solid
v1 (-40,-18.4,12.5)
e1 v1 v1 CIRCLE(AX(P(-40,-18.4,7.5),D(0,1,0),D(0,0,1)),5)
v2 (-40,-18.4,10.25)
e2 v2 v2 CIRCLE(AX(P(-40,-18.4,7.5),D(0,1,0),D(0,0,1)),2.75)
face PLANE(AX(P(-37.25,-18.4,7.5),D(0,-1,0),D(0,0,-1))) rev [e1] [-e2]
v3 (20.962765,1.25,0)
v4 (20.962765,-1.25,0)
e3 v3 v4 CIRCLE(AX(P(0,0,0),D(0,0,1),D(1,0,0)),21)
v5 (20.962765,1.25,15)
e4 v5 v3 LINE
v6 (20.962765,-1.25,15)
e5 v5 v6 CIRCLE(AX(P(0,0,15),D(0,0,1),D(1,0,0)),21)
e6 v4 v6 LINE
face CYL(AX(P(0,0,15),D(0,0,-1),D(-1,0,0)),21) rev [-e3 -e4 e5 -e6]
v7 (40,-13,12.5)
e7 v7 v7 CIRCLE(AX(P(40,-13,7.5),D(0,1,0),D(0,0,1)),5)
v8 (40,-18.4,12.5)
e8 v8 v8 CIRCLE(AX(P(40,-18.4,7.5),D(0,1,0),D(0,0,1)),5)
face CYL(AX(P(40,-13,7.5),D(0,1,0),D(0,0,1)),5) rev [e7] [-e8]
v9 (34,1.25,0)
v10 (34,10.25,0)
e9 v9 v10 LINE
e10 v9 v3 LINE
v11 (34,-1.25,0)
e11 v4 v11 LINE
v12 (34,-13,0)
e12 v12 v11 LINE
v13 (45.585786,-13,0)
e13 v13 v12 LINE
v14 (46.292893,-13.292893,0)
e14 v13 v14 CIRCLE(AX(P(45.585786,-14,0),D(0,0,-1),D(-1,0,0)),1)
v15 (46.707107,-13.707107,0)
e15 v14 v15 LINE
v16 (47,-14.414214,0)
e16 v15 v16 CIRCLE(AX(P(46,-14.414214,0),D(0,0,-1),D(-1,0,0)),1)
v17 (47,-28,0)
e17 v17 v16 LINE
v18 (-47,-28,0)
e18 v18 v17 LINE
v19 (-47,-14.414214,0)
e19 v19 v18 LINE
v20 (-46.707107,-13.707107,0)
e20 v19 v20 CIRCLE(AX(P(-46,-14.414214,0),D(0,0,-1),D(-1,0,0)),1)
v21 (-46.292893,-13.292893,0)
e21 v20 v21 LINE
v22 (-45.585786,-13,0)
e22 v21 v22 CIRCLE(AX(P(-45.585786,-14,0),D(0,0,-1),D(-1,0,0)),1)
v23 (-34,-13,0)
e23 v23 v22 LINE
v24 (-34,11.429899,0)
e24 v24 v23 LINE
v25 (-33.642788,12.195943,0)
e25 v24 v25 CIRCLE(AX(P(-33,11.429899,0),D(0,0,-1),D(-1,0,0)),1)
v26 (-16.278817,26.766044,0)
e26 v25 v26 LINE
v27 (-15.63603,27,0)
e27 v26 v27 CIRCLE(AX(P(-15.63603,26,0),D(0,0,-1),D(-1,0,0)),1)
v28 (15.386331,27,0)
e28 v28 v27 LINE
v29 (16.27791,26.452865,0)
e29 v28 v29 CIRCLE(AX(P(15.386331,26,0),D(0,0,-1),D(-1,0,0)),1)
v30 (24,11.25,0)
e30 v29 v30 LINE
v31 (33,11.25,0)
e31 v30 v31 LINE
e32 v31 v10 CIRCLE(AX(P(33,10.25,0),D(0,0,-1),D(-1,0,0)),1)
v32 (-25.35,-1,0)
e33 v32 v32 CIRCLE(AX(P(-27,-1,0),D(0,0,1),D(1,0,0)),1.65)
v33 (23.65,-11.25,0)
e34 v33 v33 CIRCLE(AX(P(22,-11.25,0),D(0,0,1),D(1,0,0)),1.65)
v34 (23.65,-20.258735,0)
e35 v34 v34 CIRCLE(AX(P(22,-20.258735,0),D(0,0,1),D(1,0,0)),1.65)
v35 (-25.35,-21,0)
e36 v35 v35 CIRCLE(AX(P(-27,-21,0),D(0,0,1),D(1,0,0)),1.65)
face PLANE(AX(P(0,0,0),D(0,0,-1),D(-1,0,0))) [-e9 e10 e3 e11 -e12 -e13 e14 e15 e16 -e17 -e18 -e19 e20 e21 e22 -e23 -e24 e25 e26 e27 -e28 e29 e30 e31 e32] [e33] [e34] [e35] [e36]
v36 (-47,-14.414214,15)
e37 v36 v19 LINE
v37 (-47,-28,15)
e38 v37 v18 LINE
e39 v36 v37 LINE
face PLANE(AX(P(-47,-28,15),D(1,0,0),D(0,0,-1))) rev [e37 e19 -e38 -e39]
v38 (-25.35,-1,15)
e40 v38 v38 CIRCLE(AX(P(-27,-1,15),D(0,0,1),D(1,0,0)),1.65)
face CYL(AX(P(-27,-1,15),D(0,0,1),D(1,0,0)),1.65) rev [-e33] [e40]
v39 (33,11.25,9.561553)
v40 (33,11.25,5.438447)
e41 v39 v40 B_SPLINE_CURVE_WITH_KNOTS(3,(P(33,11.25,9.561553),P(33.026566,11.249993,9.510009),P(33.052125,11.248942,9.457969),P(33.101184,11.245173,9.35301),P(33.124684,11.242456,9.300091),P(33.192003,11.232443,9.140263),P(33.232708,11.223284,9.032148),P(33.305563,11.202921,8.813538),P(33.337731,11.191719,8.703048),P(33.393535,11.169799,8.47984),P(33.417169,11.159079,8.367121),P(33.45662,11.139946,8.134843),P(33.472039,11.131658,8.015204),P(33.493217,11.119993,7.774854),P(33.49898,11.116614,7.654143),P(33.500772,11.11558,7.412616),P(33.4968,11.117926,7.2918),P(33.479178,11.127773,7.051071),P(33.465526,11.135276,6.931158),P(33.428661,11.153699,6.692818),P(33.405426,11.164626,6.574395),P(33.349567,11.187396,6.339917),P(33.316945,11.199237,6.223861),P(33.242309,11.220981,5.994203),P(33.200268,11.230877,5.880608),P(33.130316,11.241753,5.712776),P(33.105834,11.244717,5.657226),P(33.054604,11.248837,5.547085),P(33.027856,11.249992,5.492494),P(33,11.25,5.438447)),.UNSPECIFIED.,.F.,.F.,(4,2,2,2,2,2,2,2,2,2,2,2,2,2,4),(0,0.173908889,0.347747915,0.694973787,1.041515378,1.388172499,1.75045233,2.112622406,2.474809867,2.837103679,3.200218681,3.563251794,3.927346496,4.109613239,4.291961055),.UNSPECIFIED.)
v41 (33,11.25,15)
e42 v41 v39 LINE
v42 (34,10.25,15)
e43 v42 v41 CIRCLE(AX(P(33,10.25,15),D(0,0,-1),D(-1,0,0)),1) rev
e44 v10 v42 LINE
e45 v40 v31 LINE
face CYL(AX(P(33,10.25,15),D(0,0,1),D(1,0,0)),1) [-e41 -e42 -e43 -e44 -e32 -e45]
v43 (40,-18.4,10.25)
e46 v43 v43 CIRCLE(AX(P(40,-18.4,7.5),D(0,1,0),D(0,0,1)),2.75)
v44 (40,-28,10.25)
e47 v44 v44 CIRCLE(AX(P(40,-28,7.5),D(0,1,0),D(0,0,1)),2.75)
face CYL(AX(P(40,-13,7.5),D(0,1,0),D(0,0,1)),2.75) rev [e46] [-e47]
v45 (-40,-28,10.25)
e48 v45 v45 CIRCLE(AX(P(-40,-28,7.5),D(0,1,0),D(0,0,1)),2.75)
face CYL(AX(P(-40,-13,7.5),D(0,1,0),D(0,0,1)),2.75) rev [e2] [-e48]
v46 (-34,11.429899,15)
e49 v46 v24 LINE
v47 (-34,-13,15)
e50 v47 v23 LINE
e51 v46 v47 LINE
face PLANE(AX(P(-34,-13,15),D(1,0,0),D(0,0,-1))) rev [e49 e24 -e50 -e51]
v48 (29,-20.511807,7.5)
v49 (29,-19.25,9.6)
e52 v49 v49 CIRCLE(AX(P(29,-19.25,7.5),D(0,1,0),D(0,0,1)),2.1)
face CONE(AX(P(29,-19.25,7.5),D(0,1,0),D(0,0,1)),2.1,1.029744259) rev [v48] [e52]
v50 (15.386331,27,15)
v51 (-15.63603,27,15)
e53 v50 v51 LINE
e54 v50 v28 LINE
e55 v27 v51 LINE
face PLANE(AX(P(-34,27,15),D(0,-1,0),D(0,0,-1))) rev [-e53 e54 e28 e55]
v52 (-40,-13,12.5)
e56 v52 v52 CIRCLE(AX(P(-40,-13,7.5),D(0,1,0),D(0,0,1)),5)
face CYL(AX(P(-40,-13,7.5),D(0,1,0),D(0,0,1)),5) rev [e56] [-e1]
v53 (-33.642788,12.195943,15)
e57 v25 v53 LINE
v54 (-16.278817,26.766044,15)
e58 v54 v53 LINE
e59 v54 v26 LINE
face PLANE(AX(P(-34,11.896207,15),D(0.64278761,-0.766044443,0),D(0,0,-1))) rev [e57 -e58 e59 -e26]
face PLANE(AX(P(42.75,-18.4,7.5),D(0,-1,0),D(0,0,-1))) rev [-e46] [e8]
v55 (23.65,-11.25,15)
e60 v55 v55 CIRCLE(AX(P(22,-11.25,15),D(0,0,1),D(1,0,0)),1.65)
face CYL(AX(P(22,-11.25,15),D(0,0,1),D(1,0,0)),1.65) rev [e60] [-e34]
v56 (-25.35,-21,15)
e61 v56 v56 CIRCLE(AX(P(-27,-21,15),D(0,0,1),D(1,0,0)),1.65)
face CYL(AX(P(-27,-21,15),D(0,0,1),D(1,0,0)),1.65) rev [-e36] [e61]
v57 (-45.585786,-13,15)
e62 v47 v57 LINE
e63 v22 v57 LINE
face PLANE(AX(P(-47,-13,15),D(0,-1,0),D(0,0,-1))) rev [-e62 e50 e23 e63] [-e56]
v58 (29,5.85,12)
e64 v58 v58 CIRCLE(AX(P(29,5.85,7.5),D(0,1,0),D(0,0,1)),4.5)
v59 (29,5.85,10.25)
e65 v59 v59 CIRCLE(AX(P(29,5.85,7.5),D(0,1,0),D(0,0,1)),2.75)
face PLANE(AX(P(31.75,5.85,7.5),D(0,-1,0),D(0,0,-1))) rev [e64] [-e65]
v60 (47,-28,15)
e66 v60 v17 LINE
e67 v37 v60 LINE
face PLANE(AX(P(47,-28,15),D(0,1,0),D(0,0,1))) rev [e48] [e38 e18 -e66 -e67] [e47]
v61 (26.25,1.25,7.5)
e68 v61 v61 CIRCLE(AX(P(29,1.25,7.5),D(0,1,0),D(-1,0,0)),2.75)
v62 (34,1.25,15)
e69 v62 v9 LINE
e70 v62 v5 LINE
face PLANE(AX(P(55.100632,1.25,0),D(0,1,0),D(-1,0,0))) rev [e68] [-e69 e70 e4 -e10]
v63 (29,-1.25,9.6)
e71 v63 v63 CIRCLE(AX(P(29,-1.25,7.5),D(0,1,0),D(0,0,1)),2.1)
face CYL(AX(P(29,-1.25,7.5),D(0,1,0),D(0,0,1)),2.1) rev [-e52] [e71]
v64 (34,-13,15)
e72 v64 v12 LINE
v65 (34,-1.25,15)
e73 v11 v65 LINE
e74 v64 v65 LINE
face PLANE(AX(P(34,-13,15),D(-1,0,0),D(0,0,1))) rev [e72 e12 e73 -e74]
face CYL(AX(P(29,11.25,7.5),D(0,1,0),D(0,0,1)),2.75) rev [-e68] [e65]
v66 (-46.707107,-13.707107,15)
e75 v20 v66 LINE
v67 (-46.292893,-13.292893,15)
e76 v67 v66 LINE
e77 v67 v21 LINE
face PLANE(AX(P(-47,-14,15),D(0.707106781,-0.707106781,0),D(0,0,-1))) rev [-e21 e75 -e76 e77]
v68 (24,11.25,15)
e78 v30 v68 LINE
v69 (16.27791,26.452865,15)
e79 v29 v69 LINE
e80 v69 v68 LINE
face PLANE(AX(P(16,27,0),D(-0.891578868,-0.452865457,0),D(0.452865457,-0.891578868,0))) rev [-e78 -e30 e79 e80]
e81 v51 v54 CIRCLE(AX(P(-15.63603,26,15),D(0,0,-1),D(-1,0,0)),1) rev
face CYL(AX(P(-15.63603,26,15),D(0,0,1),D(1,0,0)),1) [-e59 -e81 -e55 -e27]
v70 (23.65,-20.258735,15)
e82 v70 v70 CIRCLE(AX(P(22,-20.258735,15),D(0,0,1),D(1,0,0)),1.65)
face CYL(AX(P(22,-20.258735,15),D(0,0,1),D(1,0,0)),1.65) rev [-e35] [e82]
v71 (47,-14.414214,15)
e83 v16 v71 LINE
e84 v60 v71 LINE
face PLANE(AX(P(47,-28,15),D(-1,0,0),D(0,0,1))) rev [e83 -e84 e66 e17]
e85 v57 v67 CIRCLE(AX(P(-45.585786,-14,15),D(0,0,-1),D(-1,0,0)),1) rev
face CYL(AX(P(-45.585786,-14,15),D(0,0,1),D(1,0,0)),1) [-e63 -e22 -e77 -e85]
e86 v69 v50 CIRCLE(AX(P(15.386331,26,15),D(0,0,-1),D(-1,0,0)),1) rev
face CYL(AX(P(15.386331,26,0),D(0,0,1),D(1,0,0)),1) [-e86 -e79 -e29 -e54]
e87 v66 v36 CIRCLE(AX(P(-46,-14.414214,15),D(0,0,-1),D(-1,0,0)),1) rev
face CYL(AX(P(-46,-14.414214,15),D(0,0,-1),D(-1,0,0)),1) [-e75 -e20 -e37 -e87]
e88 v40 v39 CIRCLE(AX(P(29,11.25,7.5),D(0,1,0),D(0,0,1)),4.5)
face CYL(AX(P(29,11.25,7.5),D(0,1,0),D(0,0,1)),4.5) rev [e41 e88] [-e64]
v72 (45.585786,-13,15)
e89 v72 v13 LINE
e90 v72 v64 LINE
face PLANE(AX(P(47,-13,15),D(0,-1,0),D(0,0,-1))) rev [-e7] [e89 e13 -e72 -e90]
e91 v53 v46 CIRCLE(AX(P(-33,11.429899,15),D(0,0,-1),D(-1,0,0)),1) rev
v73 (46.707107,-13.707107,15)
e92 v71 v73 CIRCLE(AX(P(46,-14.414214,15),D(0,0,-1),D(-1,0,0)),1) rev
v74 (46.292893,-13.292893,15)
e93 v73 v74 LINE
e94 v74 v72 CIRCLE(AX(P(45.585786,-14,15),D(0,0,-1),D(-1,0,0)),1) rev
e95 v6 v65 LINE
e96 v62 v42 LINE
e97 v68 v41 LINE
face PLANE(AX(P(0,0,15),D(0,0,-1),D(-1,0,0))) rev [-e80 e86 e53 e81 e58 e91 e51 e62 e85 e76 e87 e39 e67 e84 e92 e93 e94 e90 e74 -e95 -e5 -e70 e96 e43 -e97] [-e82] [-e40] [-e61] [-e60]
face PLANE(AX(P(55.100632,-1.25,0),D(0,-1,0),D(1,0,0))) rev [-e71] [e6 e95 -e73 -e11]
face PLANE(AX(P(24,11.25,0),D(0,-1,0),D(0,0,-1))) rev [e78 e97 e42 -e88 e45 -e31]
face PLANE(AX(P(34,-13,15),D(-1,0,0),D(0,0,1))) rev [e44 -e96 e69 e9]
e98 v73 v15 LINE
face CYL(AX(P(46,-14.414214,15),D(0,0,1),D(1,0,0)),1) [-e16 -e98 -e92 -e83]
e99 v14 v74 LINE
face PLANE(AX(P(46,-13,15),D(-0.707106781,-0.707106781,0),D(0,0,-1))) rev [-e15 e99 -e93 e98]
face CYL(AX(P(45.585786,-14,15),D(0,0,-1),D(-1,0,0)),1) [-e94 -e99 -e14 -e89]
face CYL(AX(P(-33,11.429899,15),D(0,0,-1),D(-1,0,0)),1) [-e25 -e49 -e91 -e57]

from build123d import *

# Parameters (mm, degrees)
SKETCH1_R                                            = 21
BOSS_EXTRUDE1_DEPTH                                  = 15
SKETCH2_W                                            = 42.201264836
SKETCH2_H                                            = 2.5
CUT_EXTRUDE1_DEPTH                                   = 15
CUT_EXTRUDE2_DEPTH                                   = 15
CBORE_SLOT_FOR_M5_HEX_SOCKET_HEAD_CAP_SC_D           = 5.5
CBORE_SLOT_FOR_M5_HEX_SOCKET_HEAD_CAP_SC_CBORE_D     = 10
CBORE_SLOT_FOR_M5_HEX_SOCKET_HEAD_CAP_SC_CBORE_DEPTH = 5.4
CBORE_FOR_M5_HEX_SOCKET_HEAD_CAP_SCREW1_D            = 5.5
CBORE_FOR_M5_HEX_SOCKET_HEAD_CAP_SCREW1_DEPTH        = 10
CBORE_FOR_M5_HEX_SOCKET_HEAD_CAP_SCREW1_CBORE_D      = 9
CBORE_FOR_M5_HEX_SOCKET_HEAD_CAP_SCREW1_CBORE_DEPTH  = 5.4
CHAMFER1_SIZE                                        = 1
M4_TAPPED_HOLE1_D                                    = 3.3
M5_TAPPED_HOLE1_D                                    = 4.2
M5_TAPPED_HOLE1_DEPTH                                = 18
M5_TAPPED_HOLE1_TIP                                  = 1.2618073
CHAMFER2_SIZE                                        = 18
CHAMFER2_SIZE2                                       = 15.103793361
FILLET1_R                                            = 1


with BuildPart() as part:
    # Sketch1 → Boss-Extrude1 (new body)
    with BuildSketch(Plane.XY):
        Polygon((47, -28), (-47, -28), (-47, -13), (-34, -13), (-34, 27), (34, 27), (34, -13), (47, -13), align=None)
        Circle(SKETCH1_R, mode=Mode.SUBTRACT)
    extrude(amount=BOSS_EXTRUDE1_DEPTH)

    # Sketch2 → Cut-Extrude1 (cut)
    with BuildSketch(Plane.XY.offset(15)):
        with Locations((34, 0)):
            Rectangle(SKETCH2_W, SKETCH2_H)
    extrude(amount=-CUT_EXTRUDE1_DEPTH, mode=Mode.SUBTRACT)

    # Sketch3 → Cut-Extrude2 (cut)
    with BuildSketch(Plane.XY.offset(15)):
        Polygon((34, 27), (16, 27), (24, 11.25), (34, 11.25), align=None)
    extrude(amount=-CUT_EXTRUDE2_DEPTH, mode=Mode.SUBTRACT)

    # CBORE SLOT for M5 Hex Socket Head Cap Screw1 (through all)
    with Locations(Plane(origin=(0, -13, 0), x_dir=(1, 0, 0), z_dir=(0, 1, 0))):
        with Locations((-40, -7.5), (40, -7.5)):
            CounterBoreHole(CBORE_SLOT_FOR_M5_HEX_SOCKET_HEAD_CAP_SC_D / 2, CBORE_SLOT_FOR_M5_HEX_SOCKET_HEAD_CAP_SC_CBORE_D / 2, CBORE_SLOT_FOR_M5_HEX_SOCKET_HEAD_CAP_SC_CBORE_DEPTH)

    # CBORE for M5 Hex Socket Head Cap Screw1
    with Locations(Plane(origin=(29, 11.25, 7.5), x_dir=(0, 0, 1), z_dir=(0, 1, 0))):
        with Locations((0, 0)):
            CounterBoreHole(CBORE_FOR_M5_HEX_SOCKET_HEAD_CAP_SCREW1_D / 2, CBORE_FOR_M5_HEX_SOCKET_HEAD_CAP_SCREW1_CBORE_D / 2, CBORE_FOR_M5_HEX_SOCKET_HEAD_CAP_SCREW1_CBORE_DEPTH, depth=CBORE_FOR_M5_HEX_SOCKET_HEAD_CAP_SCREW1_DEPTH)

    # Chamfer1
    chamfer1_edges = [part.edges().sort_by_distance(p)[0] for p in [
        (47, -13, 7.5),
        (-47, -13, 7.5),
    ]]
    chamfer(chamfer1_edges, length=CHAMFER1_SIZE)

    # M4 Tapped Hole1 (through all)
    with Locations(Plane(origin=(-27, -21, 15), x_dir=(1, 0, 0), z_dir=(0, 0, 1))):
        with Locations((0, 0), (0, 20), (49, 0.741264898), (49, 9.75)):
            Hole(M4_TAPPED_HOLE1_D / 2)

    # M5 Tapped Hole1
    with Locations(Plane(origin=(29, -1.25, 7.5), x_dir=(1, 0, 0), z_dir=(0, 1, 0))):
        with Locations((0, 0)):
            Hole(M5_TAPPED_HOLE1_D / 2, depth=M5_TAPPED_HOLE1_DEPTH)
            with Locations((0, 0, -(M5_TAPPED_HOLE1_DEPTH + M5_TAPPED_HOLE1_TIP / 2))):  # 118° drill point
                Cone(0, M5_TAPPED_HOLE1_D / 2, M5_TAPPED_HOLE1_TIP, mode=Mode.SUBTRACT)

    # Chamfer2
    chamfer2_edges = [part.edges().sort_by_distance(p)[0] for p in [
        (-34, 27, 7.5),
    ]]
    chamfer2_side = [part.faces().sort_by_distance(p)[0] for p in [
        (-9, 27, 7.5),
    ]]
    chamfer(chamfer2_edges, length=CHAMFER2_SIZE, length2=CHAMFER2_SIZE2, reference=chamfer2_side[0])

    # Fillet1
    # the kernel refuses this fillet: 1 mm, written as the material it takes off along each edge
    with BuildSketch(Plane(origin=(47, -14, -1.035533906), x_dir=(0, -1, 0), z_dir=(0, 0, 1)), Plane(origin=(-47, -14, -1.035533906), x_dir=(0.7071067811865497, 0.7071067811865454, 0), z_dir=(0, 0, 1)), Plane(origin=(-46, -13, -1.035533906), x_dir=(1, 0, 0), z_dir=(0, 0, 1)), Plane(origin=(46, -13, -1.035533906), x_dir=(0.7071067811865455, -0.7071067811865497, 0), z_dir=(0, 0, 1))) as fillet1_piece_1:
        with BuildLine():
            CenterArc((FILLET1_R * 0.414213562373, -FILLET1_R), FILLET1_R, 90, 45)
            Line((-FILLET1_R * 0.292893218813, -FILLET1_R * 0.292893218813), (0, 0))
            Line((0, 0), (FILLET1_R * 0.414213562373, 0))
        make_face()
    extrude(amount=17.071067812, mode=Mode.SUBTRACT)
    with BuildSketch(Plane(origin=(-34, 11.896206639, -1.165769145), x_dir=(0, -1, 0), z_dir=(0, 0, 1))) as fillet1_piece_2:
        with BuildLine():
            CenterArc((FILLET1_R * 0.466307658155, FILLET1_R), FILLET1_R, 220, 50)
            Line((-FILLET1_R * 0.299736784964, FILLET1_R * 0.357212390313), (0, 0))
            Line((0, 0), (FILLET1_R * 0.466307658155, 0))
        make_face()
    extrude(amount=17.331538291, mode=Mode.SUBTRACT)
    with BuildSketch(Plane(origin=(-16, 27, -0.909925586), x_dir=(-0.7660444431189759, -0.6427876096865418, 0), z_dir=(0, 0, 1))) as fillet1_piece_3:
        with BuildLine():
            CenterArc((FILLET1_R * 0.363970234266, FILLET1_R), FILLET1_R, 230, 40)
            Line((-FILLET1_R * 0.27881737542, FILLET1_R * 0.233955556881), (0, 0))
            Line((0, 0), (FILLET1_R * 0.363970234266, 0))
        make_face()
    extrude(amount=16.819851171, mode=Mode.SUBTRACT)
    with BuildSketch(Plane(origin=(34, 11.25, 17.5), x_dir=(-1, 0, 0), z_dir=(0, 0, -1))) as fillet1_piece_4:
        with BuildLine():
            CenterArc((FILLET1_R, -FILLET1_R), FILLET1_R, 90, 90)
            Line((0, -FILLET1_R), (0, 0))
            Line((0, 0), (FILLET1_R, 0))
        make_face()
    extrude(amount=20, mode=Mode.SUBTRACT)
    with BuildSketch(Plane(origin=(16, 27, 16.534173147), x_dir=(-1, 0, 0), z_dir=(0, 0, -1))) as fillet1_piece_5:
        with BuildLine():
            CenterArc((FILLET1_R * 0.613669258853, -FILLET1_R), FILLET1_R, 90, 63.072322149)
            Line((-FILLET1_R * 0.27790960924, -FILLET1_R * 0.547134543191), (0, 0))
            Line((0, 0), (FILLET1_R * 0.613669258853, 0))
        make_face()
    extrude(amount=18.068346294, mode=Mode.SUBTRACT)


solid = part.part
